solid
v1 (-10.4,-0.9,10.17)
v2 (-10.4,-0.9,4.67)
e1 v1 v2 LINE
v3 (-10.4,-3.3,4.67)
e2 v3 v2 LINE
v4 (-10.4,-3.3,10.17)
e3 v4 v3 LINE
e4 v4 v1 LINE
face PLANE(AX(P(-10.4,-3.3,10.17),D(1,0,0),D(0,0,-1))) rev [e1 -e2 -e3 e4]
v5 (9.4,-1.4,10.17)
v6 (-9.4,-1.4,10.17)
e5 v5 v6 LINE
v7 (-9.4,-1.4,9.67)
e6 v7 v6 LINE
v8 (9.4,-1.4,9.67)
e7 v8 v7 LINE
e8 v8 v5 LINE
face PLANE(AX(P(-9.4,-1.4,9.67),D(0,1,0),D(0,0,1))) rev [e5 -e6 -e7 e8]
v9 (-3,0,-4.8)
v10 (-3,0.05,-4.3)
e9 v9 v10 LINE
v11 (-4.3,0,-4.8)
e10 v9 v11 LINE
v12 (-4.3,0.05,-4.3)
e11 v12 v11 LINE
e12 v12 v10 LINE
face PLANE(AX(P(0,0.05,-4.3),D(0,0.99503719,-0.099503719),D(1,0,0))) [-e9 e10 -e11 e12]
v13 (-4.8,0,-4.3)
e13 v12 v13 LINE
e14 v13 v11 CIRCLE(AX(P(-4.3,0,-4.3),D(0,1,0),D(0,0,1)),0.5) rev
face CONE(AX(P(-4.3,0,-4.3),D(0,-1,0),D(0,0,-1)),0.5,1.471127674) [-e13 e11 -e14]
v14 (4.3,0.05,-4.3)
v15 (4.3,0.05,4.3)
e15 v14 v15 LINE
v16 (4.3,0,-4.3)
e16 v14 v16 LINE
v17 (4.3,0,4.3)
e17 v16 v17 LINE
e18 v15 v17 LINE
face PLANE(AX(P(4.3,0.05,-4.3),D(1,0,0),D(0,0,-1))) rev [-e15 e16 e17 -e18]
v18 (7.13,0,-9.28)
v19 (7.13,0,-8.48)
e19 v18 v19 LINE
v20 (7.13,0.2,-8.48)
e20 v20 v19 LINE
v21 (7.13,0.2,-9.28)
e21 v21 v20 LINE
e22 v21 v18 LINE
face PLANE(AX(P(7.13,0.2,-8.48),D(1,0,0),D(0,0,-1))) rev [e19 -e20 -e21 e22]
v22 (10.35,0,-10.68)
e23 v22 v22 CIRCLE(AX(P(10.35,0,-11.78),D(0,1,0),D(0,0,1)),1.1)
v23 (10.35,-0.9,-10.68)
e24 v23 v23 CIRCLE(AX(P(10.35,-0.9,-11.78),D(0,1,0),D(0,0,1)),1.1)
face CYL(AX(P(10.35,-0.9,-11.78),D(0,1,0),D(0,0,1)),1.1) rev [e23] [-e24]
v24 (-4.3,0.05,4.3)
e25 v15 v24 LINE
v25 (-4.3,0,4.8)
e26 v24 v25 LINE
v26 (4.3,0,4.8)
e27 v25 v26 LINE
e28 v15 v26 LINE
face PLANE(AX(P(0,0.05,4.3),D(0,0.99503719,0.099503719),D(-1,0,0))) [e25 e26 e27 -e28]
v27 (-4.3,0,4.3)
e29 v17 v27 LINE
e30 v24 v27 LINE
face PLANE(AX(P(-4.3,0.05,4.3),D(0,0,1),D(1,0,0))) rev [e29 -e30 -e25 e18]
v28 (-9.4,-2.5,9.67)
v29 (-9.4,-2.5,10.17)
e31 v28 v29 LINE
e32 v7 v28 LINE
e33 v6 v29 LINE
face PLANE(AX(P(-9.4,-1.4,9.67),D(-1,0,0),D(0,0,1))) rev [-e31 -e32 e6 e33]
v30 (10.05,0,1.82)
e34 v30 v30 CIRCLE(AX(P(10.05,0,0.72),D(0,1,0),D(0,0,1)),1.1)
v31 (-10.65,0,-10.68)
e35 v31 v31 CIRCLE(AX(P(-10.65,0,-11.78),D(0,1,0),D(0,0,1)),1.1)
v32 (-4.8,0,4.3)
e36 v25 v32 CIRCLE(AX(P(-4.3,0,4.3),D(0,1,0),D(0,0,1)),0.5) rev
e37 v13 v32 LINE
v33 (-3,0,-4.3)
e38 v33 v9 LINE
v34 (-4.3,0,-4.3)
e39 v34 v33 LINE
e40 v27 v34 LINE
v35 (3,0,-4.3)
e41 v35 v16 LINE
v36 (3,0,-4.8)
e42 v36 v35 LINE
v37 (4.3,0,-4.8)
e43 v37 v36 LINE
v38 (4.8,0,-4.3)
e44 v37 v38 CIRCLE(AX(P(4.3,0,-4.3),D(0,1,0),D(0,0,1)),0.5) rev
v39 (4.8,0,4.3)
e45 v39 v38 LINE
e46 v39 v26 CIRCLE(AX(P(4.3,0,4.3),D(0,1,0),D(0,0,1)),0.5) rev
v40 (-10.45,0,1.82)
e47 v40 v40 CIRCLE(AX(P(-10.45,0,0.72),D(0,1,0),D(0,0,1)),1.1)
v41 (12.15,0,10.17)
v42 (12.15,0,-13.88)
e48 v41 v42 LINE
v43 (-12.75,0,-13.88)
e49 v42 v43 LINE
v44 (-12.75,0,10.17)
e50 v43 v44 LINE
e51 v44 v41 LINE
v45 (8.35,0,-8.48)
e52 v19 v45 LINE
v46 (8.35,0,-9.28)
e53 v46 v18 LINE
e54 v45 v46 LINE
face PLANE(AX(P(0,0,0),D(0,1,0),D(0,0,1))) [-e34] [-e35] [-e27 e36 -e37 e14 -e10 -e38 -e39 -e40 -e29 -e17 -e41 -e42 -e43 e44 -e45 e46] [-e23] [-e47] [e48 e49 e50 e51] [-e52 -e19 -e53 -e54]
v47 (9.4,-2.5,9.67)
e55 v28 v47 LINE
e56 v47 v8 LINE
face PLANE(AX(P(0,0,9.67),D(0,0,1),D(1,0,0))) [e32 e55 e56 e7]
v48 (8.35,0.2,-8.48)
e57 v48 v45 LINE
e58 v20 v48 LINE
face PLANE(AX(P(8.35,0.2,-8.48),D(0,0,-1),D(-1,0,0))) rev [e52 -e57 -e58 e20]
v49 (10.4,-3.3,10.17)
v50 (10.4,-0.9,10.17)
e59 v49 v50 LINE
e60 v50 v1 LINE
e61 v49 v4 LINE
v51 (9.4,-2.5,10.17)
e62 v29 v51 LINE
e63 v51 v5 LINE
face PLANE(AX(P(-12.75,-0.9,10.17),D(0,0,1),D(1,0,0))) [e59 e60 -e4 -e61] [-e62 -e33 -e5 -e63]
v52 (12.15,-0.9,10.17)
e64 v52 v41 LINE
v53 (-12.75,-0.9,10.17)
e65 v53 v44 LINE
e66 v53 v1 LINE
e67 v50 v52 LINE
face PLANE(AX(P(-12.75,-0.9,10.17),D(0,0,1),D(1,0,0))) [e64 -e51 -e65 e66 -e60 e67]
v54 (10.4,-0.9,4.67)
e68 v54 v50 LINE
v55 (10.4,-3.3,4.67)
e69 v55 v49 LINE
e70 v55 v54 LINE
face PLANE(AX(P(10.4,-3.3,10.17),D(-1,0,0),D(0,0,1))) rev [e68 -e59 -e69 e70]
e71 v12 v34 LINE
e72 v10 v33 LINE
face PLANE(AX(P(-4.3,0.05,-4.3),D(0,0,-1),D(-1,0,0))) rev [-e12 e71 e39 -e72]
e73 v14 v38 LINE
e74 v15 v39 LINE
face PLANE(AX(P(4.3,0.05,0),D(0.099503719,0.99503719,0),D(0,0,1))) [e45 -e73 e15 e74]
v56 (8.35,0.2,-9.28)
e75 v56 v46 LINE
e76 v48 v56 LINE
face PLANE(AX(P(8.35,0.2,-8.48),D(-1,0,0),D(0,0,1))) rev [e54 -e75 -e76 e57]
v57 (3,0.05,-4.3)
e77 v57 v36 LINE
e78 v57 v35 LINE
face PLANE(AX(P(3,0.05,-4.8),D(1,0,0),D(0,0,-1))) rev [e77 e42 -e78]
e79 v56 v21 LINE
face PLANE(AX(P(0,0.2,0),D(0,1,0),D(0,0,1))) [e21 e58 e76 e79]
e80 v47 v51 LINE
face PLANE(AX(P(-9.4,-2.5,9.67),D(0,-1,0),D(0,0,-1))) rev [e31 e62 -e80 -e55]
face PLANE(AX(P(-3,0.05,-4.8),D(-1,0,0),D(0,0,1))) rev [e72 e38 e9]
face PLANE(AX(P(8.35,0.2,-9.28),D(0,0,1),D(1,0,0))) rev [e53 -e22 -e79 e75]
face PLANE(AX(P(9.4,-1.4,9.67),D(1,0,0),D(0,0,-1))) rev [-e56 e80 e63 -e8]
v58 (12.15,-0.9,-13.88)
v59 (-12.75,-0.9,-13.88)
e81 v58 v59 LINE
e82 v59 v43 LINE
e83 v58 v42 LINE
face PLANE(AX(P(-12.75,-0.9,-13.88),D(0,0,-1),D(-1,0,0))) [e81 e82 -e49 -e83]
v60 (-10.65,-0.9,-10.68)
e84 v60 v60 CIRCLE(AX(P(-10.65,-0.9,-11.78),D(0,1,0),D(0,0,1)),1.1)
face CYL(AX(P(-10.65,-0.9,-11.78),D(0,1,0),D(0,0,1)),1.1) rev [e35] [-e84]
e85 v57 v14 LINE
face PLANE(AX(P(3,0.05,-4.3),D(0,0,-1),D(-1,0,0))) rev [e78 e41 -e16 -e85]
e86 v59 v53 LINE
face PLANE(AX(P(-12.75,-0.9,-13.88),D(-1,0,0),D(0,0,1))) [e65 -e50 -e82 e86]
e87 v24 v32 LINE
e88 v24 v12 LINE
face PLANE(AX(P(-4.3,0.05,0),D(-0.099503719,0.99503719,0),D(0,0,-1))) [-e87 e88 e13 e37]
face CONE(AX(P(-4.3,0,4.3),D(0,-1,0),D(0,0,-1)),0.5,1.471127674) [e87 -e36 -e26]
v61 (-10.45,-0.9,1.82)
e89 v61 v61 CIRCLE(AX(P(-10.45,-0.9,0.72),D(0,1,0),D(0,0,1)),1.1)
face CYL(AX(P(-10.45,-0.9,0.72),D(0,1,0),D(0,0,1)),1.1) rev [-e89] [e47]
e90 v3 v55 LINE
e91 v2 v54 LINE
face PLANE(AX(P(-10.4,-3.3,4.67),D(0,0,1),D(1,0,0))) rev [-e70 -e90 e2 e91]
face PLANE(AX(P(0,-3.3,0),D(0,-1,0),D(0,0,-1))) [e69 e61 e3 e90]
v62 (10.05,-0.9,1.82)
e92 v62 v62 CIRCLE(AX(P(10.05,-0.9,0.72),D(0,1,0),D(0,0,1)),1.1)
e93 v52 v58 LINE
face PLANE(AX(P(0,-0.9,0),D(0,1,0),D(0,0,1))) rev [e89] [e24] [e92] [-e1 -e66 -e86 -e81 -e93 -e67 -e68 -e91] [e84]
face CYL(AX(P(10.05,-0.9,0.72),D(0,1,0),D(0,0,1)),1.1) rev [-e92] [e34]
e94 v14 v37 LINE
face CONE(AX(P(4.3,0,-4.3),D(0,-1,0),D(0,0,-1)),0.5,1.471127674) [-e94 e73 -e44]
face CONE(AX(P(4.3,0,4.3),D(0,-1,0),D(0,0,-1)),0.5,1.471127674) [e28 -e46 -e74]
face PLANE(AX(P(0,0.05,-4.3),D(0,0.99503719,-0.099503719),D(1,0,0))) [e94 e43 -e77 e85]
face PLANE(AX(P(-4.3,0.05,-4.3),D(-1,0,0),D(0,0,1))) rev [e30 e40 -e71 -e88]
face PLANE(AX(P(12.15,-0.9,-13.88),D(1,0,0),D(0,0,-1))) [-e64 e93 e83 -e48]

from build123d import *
from OCP.BRepFilletAPI import BRepFilletAPI_MakeChamfer

# Parameters (mm, degrees)
SKIZZE1_W               = 24.9
SKIZZE1_H               = 24.05
SKIZZE1_R               = 1.1
PCB_DEPTH               = 0.9
BOSS_EXTRUDE1_DEPTH     = 0.05
SKIZZE3_W               = 20.8
SKIZZE3_H               = 5.5
CONNECTOR_CLOSED_DEPTH  = 2.4
ESQUISSE1_W             = 1.22
ESQUISSE1_H             = 0.8
STATUS_LED_DEPTH        = 0.2
ESQUISSE3_W             = 18.8
ESQUISSE3_H             = 1.1
ENL_V_MAT_EXTRU_1_DEPTH = 0.5
FILLET1_R               = 0.5
CHAMFER1_SIZE           = 0.05
CHAMFER1_SIZE_2         = 0.5


with BuildPart() as part:
    # Skizze1 → PCB (new body)
    with BuildSketch(Plane(origin=(0, 0, 0), x_dir=(1, 0, 0), z_dir=(0, 1, 0))):
        with Locations((-0.3, 1.855)):
            Rectangle(SKIZZE1_W, SKIZZE1_H)
        with Locations(Location((-10.65, 11.78, 0), (0, 0, 270))):
            Circle(SKIZZE1_R, mode=Mode.SUBTRACT)
        with Locations(Location((10.35, 11.78, 0), (0, 0, 270))):
            Circle(SKIZZE1_R, mode=Mode.SUBTRACT)
        with Locations(Location((-10.45, -0.72, 0), (0, 0, 270))):
            Circle(SKIZZE1_R, mode=Mode.SUBTRACT)
        with Locations(Location((10.05, -0.72, 0), (0, 0, 270))):
            Circle(SKIZZE1_R, mode=Mode.SUBTRACT)
    extrude(amount=-PCB_DEPTH)

    # Sketch4 → Boss-Extrude1 (add)
    with BuildSketch(Plane(origin=(0, 0, 0), x_dir=(1, 0, 0), z_dir=(0, 1, 0))):
        Polygon((-4.3, 4.3), (-3, 4.3), (-3, 4.8), (-4.8, 4.8), (-4.8, -4.8), (4.8, -4.8), (4.8, 4.8), (3, 4.8), (3, 4.3), (4.3, 4.3), (4.3, -4.3), (-4.3, -4.3), align=None)
    extrude(amount=BOSS_EXTRUDE1_DEPTH)

    # Skizze3 → Connector_closed (add)
    with BuildSketch(Plane.XZ.offset(0.9)):
        with Locations((0, 7.42)):
            Rectangle(SKIZZE3_W, SKIZZE3_H)
    extrude(amount=CONNECTOR_CLOSED_DEPTH)

    # Esquisse1 → Status LED (add)
    with BuildSketch(Plane(origin=(0, 0, 0), x_dir=(1, 0, 0), z_dir=(0, 1, 0))):
        with Locations((7.74, 8.88)):
            Rectangle(ESQUISSE1_W, ESQUISSE1_H)
    extrude(amount=STATUS_LED_DEPTH)

    # Esquisse3 → Enlèv. mat.-Extru.1 (cut)
    with BuildSketch(Plane.XY.offset(10.17)):
        with Locations((0, -1.95)):
            Rectangle(ESQUISSE3_W, ESQUISSE3_H)
    extrude(amount=-ENL_V_MAT_EXTRU_1_DEPTH, mode=Mode.SUBTRACT)

    # Fillet1
    fillet1_edges = [part.edges().sort_by_distance(p)[0] for p in [
        (-4.8, 0.025, -4.8),
        (-4.8, 0.025, 4.8),
        (4.8, 0.025, 4.8),
        (4.8, 0.025, -4.8),
    ]]
    fillet(fillet1_edges, radius=FILLET1_R)

    # Chamfer1
    chamfer1_edges_1 = [part.edges().sort_by_distance(p)[0] for p in [
        (3.65, 0.05, -4.8),
    ]]
    chamfer1_side_1 = [part.faces().sort_by_distance(p)[0] for p in [
        (3.65, 0.049, -4.8),
    ]]
    chamfer1_edges_2 = [part.edges().sort_by_distance(p)[0] for p in [
        (4.8, 0.05, 0),
    ]]
    chamfer1_side_2 = [part.faces().sort_by_distance(p)[0] for p in [
        (4.8, 0.049, 0),
    ]]
    chamfer1_edges_3 = [part.edges().sort_by_distance(p)[0] for p in [
        (0, 0.05, 4.8),
    ]]
    chamfer1_side_3 = [part.faces().sort_by_distance(p)[0] for p in [
        (0, 0.049, 4.8),
    ]]
    chamfer1_edges_4 = [part.edges().sort_by_distance(p)[0] for p in [
        (-4.8, 0.05, 0),
    ]]
    chamfer1_side_4 = [part.faces().sort_by_distance(p)[0] for p in [
        (-4.8, 0.049, 0),
    ]]
    chamfer1_edges_5 = [part.edges().sort_by_distance(p)[0] for p in [
        (-3.65, 0.05, -4.8),
    ]]
    chamfer1_side_5 = [part.faces().sort_by_distance(p)[0] for p in [
        (-3.65, 0.049, -4.8),
    ]]
    chamfer1_edges_6 = [part.edges().sort_by_distance(p)[0] for p in [
        (4.653553391, 0.05, -4.653553391),
    ]]
    chamfer1_side_6 = [part.faces().sort_by_distance(p)[0] for p in [
        (4.653553391, 0.049, -4.653553391),
    ]]
    chamfer1_edges_7 = [part.edges().sort_by_distance(p)[0] for p in [
        (4.653553391, 0.05, 4.653553391),
    ]]
    chamfer1_side_7 = [part.faces().sort_by_distance(p)[0] for p in [
        (4.653553391, 0.049, 4.653553391),
    ]]
    chamfer1_edges_8 = [part.edges().sort_by_distance(p)[0] for p in [
        (-4.653553391, 0.05, 4.653553391),
    ]]
    chamfer1_side_8 = [part.faces().sort_by_distance(p)[0] for p in [
        (-4.653553391, 0.049, 4.653553391),
    ]]
    chamfer1_edges_9 = [part.edges().sort_by_distance(p)[0] for p in [
        (-4.653553391, 0.05, -4.653553391),
    ]]
    chamfer1_side_9 = [part.faces().sort_by_distance(p)[0] for p in [
        (-4.653553391, 0.049, -4.653553391),
    ]]
    chamfer1 = BRepFilletAPI_MakeChamfer(part.part.solid().wrapped)
    for e in chamfer1_edges_1:
        chamfer1.Add(CHAMFER1_SIZE - 0.0001, CHAMFER1_SIZE_2 - 0.0001, e.wrapped, chamfer1_side_1[0].wrapped)
    for e in chamfer1_edges_2:
        chamfer1.Add(CHAMFER1_SIZE - 0.0001, CHAMFER1_SIZE_2 - 0.0001, e.wrapped, chamfer1_side_2[0].wrapped)
    for e in chamfer1_edges_3:
        chamfer1.Add(CHAMFER1_SIZE - 0.0001, CHAMFER1_SIZE_2 - 0.0001, e.wrapped, chamfer1_side_3[0].wrapped)
    for e in chamfer1_edges_4:
        chamfer1.Add(CHAMFER1_SIZE - 0.0001, CHAMFER1_SIZE_2 - 0.0001, e.wrapped, chamfer1_side_4[0].wrapped)
    for e in chamfer1_edges_5:
        chamfer1.Add(CHAMFER1_SIZE - 0.0001, CHAMFER1_SIZE_2 - 0.0001, e.wrapped, chamfer1_side_5[0].wrapped)
    for e in chamfer1_edges_6:
        chamfer1.Add(CHAMFER1_SIZE - 0.0001, CHAMFER1_SIZE_2 - 0.0001, e.wrapped, chamfer1_side_6[0].wrapped)
    for e in chamfer1_edges_7:
        chamfer1.Add(CHAMFER1_SIZE - 0.0001, CHAMFER1_SIZE_2 - 0.0001, e.wrapped, chamfer1_side_7[0].wrapped)
    for e in chamfer1_edges_8:
        chamfer1.Add(CHAMFER1_SIZE - 0.0001, CHAMFER1_SIZE_2 - 0.0001, e.wrapped, chamfer1_side_8[0].wrapped)
    for e in chamfer1_edges_9:
        chamfer1.Add(CHAMFER1_SIZE - 0.0001, CHAMFER1_SIZE_2 - 0.0001, e.wrapped, chamfer1_side_9[0].wrapped)
    add(Compound.cast(chamfer1.Shape()), mode=Mode.REPLACE)  # a hair under: the kernel refuses the full size


solid = part.part
